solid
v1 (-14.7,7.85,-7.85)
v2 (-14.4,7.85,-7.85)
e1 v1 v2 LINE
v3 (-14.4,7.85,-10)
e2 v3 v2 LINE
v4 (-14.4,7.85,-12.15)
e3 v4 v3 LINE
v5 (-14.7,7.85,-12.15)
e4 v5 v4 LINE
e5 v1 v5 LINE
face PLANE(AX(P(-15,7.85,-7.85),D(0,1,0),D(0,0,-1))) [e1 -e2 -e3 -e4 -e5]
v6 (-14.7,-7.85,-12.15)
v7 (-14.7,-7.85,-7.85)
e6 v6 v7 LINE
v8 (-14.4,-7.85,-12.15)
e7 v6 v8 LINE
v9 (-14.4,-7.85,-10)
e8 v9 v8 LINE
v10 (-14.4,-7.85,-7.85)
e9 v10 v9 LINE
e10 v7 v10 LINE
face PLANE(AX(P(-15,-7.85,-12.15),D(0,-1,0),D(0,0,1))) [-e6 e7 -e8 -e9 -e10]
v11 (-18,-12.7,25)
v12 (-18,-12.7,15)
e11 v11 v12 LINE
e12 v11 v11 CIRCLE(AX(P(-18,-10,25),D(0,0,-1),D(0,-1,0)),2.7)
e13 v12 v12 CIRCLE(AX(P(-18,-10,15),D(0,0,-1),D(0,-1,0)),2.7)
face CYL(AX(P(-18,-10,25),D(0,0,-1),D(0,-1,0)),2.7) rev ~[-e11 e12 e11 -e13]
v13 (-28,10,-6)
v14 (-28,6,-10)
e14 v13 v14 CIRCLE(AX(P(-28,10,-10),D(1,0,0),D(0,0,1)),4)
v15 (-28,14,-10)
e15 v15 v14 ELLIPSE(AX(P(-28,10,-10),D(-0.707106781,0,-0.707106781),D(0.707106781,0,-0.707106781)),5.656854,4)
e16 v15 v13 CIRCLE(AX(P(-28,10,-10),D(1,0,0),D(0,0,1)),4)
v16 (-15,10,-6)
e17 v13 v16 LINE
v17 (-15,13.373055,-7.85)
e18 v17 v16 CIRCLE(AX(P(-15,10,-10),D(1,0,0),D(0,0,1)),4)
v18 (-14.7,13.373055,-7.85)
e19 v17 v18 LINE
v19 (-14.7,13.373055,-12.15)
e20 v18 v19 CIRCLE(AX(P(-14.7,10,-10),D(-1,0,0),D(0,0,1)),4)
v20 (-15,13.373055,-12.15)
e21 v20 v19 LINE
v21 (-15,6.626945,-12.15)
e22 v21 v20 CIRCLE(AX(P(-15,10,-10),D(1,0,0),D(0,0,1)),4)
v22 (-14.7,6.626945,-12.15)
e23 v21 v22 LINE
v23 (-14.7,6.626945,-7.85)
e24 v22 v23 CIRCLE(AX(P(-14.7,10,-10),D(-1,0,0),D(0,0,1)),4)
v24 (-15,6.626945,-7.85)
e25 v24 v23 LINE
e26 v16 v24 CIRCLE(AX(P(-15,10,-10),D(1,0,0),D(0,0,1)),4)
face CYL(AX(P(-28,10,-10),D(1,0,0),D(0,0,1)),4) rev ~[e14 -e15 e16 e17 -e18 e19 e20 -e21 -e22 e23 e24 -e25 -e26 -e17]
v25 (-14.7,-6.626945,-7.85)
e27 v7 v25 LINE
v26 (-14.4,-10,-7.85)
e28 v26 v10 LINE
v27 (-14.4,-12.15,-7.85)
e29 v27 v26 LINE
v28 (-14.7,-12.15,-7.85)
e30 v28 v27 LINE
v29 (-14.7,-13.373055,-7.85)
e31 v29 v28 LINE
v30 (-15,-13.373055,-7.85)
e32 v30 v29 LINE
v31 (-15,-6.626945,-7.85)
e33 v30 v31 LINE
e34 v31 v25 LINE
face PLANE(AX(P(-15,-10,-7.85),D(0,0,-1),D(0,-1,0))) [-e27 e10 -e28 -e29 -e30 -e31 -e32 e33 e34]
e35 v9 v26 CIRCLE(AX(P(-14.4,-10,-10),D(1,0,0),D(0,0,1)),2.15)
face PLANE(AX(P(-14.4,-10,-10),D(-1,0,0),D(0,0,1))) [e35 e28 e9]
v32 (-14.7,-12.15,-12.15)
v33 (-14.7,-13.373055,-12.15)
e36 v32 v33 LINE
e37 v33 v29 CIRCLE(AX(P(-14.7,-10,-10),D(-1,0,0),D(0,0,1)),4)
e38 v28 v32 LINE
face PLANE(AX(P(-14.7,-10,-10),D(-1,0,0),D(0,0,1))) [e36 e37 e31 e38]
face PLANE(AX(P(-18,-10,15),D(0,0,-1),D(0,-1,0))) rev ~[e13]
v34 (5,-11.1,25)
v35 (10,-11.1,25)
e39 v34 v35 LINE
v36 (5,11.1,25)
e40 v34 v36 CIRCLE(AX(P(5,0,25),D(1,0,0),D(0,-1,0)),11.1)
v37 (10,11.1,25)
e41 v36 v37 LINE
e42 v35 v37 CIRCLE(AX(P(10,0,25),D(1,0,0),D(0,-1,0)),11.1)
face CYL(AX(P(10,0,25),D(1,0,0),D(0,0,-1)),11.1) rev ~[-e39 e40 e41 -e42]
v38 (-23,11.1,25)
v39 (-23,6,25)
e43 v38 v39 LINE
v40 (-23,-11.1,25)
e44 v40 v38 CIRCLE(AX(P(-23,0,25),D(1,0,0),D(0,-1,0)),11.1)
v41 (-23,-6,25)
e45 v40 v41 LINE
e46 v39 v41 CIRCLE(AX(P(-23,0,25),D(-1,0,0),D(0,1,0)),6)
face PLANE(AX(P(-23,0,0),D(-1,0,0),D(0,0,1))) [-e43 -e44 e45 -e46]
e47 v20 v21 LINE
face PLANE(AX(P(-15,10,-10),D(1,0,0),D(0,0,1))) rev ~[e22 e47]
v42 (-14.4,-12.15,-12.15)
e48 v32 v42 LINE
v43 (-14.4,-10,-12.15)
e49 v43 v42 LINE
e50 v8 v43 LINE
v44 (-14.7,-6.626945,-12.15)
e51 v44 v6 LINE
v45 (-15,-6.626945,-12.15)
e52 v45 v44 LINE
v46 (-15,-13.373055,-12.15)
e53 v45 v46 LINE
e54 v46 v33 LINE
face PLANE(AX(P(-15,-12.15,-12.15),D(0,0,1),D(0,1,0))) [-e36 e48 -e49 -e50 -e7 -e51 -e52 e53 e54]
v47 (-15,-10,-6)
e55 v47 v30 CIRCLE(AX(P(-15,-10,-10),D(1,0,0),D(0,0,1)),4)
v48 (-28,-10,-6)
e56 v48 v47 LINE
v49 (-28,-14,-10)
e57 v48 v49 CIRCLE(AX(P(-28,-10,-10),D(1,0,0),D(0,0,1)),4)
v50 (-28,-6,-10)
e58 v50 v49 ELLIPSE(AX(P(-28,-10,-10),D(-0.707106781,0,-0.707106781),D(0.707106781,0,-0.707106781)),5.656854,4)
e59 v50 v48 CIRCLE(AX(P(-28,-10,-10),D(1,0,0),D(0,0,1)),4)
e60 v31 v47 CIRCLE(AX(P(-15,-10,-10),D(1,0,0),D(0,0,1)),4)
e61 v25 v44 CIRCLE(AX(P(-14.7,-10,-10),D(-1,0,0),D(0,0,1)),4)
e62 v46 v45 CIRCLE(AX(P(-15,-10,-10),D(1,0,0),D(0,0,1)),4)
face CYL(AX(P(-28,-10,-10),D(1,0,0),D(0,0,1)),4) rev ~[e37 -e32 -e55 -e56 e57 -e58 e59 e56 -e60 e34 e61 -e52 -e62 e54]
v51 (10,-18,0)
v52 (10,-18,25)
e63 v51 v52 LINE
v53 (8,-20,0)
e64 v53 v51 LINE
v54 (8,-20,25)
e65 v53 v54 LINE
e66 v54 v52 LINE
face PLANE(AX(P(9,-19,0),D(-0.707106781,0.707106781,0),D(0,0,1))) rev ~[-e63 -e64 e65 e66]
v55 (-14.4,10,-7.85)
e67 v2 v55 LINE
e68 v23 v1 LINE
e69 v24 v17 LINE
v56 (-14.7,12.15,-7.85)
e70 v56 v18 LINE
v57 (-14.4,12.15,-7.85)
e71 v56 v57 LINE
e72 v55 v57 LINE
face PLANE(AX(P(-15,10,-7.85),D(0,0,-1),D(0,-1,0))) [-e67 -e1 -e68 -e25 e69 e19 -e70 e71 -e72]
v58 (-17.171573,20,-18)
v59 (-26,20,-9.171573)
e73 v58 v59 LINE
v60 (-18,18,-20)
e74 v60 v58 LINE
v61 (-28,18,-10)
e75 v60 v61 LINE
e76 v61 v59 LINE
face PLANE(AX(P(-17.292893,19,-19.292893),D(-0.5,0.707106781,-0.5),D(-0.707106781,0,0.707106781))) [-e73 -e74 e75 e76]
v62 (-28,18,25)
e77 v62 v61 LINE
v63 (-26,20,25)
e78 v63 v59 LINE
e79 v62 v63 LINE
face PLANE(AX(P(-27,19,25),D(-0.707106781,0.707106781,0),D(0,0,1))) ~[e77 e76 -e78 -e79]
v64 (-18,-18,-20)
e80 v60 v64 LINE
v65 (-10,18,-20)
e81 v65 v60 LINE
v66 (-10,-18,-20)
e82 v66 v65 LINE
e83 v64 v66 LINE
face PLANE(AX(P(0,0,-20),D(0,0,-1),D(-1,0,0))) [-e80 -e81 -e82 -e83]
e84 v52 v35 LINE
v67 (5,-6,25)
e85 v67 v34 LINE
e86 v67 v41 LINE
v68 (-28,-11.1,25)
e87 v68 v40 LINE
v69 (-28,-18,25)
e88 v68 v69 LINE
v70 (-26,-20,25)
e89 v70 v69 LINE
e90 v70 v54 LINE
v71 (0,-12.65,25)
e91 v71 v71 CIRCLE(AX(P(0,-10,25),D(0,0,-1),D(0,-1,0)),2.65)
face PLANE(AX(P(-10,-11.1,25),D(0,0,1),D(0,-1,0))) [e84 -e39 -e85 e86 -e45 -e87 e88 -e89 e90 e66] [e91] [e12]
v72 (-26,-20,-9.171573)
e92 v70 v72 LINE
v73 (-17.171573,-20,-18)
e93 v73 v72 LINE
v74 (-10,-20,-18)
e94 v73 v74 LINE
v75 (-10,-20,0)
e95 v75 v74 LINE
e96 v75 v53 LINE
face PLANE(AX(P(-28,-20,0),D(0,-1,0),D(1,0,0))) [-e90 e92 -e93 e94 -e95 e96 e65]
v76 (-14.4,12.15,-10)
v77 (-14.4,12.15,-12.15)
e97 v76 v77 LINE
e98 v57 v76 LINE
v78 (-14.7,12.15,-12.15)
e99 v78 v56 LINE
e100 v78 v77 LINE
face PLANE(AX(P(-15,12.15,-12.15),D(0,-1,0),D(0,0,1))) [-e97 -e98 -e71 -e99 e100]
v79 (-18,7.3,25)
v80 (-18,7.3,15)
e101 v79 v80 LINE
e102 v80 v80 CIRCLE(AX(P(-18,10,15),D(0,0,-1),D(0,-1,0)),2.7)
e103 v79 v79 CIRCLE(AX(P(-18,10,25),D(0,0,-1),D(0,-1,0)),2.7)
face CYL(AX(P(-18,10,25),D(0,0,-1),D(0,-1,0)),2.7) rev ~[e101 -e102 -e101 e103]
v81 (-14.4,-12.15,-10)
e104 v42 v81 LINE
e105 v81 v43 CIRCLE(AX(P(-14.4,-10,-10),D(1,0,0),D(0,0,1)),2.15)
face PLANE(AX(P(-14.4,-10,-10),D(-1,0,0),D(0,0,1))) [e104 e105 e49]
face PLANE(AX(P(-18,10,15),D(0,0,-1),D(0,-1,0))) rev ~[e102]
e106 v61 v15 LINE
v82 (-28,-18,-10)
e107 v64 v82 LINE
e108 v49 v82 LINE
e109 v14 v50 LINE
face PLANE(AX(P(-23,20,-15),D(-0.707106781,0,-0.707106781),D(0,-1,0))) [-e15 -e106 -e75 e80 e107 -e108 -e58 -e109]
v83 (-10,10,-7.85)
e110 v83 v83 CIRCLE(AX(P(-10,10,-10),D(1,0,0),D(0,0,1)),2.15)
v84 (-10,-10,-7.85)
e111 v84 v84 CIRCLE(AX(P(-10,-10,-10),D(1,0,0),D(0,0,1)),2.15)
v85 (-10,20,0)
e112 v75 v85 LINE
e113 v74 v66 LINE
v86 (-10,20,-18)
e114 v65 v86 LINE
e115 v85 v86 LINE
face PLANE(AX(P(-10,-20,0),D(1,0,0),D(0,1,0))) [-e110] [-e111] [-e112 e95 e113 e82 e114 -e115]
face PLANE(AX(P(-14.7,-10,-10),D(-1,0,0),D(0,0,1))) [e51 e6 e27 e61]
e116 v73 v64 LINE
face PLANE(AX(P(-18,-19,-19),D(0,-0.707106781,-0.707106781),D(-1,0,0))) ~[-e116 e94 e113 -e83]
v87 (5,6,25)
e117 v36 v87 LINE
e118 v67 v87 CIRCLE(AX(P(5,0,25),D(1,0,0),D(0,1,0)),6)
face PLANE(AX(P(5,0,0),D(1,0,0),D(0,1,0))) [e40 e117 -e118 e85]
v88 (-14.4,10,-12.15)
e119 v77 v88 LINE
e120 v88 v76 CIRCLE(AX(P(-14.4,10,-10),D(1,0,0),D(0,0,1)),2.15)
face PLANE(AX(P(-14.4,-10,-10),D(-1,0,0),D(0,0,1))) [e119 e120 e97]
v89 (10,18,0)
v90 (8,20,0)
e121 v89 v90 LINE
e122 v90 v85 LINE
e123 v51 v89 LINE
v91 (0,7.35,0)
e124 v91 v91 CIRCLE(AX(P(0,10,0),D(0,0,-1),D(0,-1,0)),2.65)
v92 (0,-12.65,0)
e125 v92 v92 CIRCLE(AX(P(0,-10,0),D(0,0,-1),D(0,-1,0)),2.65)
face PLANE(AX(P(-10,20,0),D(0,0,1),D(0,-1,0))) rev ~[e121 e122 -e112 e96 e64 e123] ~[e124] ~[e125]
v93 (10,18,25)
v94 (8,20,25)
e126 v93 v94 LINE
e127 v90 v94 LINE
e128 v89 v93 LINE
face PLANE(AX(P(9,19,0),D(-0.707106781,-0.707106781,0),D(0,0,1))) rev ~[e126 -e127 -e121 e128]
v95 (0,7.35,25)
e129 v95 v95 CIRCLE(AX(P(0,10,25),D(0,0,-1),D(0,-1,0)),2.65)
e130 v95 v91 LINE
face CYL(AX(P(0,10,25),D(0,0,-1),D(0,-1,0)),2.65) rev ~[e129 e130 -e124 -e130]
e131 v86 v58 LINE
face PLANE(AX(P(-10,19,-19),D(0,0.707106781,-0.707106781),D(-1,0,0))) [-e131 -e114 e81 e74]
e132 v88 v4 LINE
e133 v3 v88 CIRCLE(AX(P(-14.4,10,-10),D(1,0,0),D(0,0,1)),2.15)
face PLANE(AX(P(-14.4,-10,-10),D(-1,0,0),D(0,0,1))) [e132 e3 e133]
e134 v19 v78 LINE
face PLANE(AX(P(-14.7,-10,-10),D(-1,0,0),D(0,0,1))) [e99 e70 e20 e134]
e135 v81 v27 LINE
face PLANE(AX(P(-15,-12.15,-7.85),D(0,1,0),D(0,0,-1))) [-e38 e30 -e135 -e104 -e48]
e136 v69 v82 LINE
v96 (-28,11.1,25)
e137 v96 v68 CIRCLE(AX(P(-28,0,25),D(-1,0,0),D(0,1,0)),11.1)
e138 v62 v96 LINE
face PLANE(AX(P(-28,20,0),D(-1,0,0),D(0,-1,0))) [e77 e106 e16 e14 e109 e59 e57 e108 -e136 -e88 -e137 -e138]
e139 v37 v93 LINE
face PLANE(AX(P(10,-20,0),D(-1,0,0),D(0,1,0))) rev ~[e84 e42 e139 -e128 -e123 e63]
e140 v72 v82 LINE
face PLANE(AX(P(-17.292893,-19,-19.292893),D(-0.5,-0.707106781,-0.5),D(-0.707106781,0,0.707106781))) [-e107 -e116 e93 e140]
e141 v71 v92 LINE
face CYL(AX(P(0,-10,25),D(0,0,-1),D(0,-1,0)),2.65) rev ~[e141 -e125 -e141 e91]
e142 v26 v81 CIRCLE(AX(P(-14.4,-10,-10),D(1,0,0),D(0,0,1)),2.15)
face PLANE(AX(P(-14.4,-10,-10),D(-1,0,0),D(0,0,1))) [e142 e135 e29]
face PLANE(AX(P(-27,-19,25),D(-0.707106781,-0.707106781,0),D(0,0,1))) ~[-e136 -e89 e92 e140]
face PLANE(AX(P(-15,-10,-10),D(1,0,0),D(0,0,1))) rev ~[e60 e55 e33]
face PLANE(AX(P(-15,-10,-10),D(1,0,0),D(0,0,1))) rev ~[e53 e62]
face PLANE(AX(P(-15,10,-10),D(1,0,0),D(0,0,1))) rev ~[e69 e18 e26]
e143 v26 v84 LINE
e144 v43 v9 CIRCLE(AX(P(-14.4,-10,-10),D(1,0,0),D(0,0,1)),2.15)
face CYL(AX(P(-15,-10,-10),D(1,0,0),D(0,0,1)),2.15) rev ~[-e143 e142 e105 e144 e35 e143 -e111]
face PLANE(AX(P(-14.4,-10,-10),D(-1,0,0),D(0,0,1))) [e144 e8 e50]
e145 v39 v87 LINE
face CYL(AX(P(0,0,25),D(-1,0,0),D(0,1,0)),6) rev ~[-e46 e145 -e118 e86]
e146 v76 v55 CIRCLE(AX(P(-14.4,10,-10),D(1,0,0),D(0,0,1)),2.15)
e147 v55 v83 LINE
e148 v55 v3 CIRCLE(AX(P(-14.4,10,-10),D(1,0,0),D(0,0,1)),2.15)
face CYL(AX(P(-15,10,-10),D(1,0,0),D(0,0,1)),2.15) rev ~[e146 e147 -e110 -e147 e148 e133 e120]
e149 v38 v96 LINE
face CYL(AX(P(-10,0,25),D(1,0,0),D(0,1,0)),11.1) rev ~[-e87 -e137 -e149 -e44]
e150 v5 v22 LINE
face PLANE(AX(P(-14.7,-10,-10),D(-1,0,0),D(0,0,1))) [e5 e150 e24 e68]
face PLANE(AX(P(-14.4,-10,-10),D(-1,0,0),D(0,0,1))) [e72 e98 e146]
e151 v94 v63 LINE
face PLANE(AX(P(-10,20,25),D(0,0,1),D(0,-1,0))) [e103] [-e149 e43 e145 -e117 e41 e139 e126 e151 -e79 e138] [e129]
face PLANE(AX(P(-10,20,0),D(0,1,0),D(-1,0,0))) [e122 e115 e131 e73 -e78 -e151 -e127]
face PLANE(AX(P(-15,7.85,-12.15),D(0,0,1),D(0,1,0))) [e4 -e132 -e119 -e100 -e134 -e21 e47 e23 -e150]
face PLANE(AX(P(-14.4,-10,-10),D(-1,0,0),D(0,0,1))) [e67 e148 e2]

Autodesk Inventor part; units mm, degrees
ref_plane "YZ Plane" through (0, 0, 0) normal (1, 0, 0) x (0, 1, 0)
ref_plane "XZ Plane" through (0, 0, 0) normal (0, 1, 0) x (-1, 0, 0)
ref_plane "XY Plane" through (0, 0, 0) normal (0, 0, 1) x (1, 0, 0)
sketch "スケッチ1" plane through (0, 0, 0) normal (0, 0, 1) x (1, 0, 0)
  line L0 (-10, -20) -> (10, -20)
  line L1 (10, -20) -> (10, 20)
  line L2 (10, 20) -> (-10, 20)
  line L3 (-10, 20) -> (-10, -20)
  line L4 (-10, -20) -> (10, 20) construction
  line L5 (10, -20) -> (-10, 20) construction
  point P0 (0, 0)
  dimension "d0" = 20
  dimension "d1" = 40
extrude "押し出し1" add sketch "スケッチ1" along normal blind 25
sketch "スケッチ2" plane through (10, -20, 0) normal (1, 0, 0) x (0, 0, -1)
  circle A0 centre (-25, 20) radius 11.1
  line L0 (0, 40) -> (-25, 40) projected
  dimension "d4" = 22.2
  dimension "d7" = 20
extrude "押し出し2" cut sketch "スケッチ2" against normal through all
sketch "スケッチ7" plane through (0, 0, 0) normal (1, 0, 0) x (0, 1, 0)
  arc A0 (-11.1, 25) -> (11.1, 25) centre (0, 25) ccw projected
  line L0 (20, 25) -> (11.1, 25) projected
  line L1 (20, 0) -> (20, 25) projected
  line L2 (20, 0) -> (-20, 0) projected
  line L3 (-20, 0) -> (-20, 25) projected
  line L4 (-11.1, 25) -> (-20, 25) projected
  circle A1 centre (0, 25) radius 6
  arc A2 (-11.1, 25) -> (11.1, 25) centre (0, 25) ccw projected
  line L5 (11.1, 25) -> (-11.1, 25)
  point P0 (0, 0)
  point P1 (-6, 25)
  point P2 (6, 25)
  dimension "d27" = 12
extrude "押し出し5" add sketch "スケッチ7" along normal mid plane 10 contours L5 A1 A0
sketch "スケッチ5" plane through (0, 0, 25) normal (0, 0, 1) x (1, 0, 0)
  line L0 (10, 20) -> (-10, 20) projected
  line L1 (-10, -20) -> (10, -20) projected
  point P0 (0, 0)
  point P1 (0, 10)
  point P2 (0, -10)
  dimension "d18" = 10
  dimension "d19" = 10
hole "穴1" at (0, 10, 25) at (0, -10, 25) direction (0, 0, -1) diameter 5.3 depth 58
sketch "Sketch9" plane through (-10, -20, 0) normal (-1, 0, 0) x (0, 0, 1)
  arc A0 (25, 31.1) -> (25, 8.9) centre (25, 20) ccw projected
  line L0 (25, 40) -> (25, 31.1) projected
  line L1 (0, 40) -> (25, 40) projected
  line L2 (0, 40) -> (0, 0) projected
  line L3 (0, 0) -> (25, 0) projected
  line L4 (25, 8.9) -> (25, 0) projected
  point P0 (0, 20)
extrude "Extrusion7" add sketch "Sketch9" along normal blind 18
sketch "Sketch10" plane through (0, 0, 0) normal (0, 0, -1) x (-1, 0, 0)
  circle A0 centre (0, 10) radius 2.65 projected
  circle A1 centre (0, -10) radius 2.65 projected
  line L0 (28, -20) -> (-10, -20) projected
  line L1 (28, 20) -> (28, -20) projected
  line L2 (-10, 20) -> (28, 20) projected
  line L3 (-10, -20) -> (-10, 20) projected
  line L4 (-10, -20) -> (-10, -11.1) projected
  line L5 (-10, 20) -> (28, 20) projected
  line L6 (-10, -20) -> (10, -20)
  line L7 (10, -20) -> (10, 20)
  line L8 (10, 20) -> (-10, 20)
  line L9 (-10, 20) -> (-10, -20)
  point P0 (0, 0)
  dimension "d34" = 20
extrude "Extrusion8" add sketch "Sketch10" along normal blind 20 contours L0 L7 L2 L1
sketch "Sketch11" plane through (-5, 0, 0) normal (-1, 0, 0) x (0, 0, 1)
  line L0 (0, 7.35) -> (25, 7.35) projected
  line L1 (25, -11.1) -> (25, -6) projected
  arc A0 (25, 6) -> (25, -6) centre (25, 0) ccw projected
  line L2 (25, 6) -> (25, 11.1) projected
  arc A1 (25, 11.1) -> (25, -11.1) centre (25, 0) ccw projected
  point P0 (0, 0)
extrude "Extrusion9" add sketch "Sketch11" along normal blind 18
chamfer "Chamfer2" distance 10 angle 45 1 edges at (-28, 0, -20)
sketch "Sketch12" plane through (0, 0, 25) normal (0, 0, 1) x (1, 0, 0)
  line L0 (10, -20) -> (10, -11.1) projected
  circle A0 centre (0, -10) radius 2.65 projected
  line L1 (10, -11.1) -> (5, -11.1) projected
  line L2 (5, -6) -> (5, -11.1) projected
  line L3 (5, -6) -> (-23, -6) projected
  line L4 (-23, -11.1) -> (-23, -6) projected
  line L5 (-23, -11.1) -> (-28, -11.1) projected
  line L6 (-28, -20) -> (-28, -11.1) projected
  line L7 (10, -20) -> (-28, -20) projected
  line L8 (10, -20) -> (10, -11.1) projected
  circle A1 centre (0, 10) radius 2.65 projected
  line L9 (-28, 11.1) -> (-23, 11.1) projected
  line L10 (-23, 6) -> (-23, 11.1) projected
  line L11 (-23, 6) -> (5, 6) projected
  line L12 (5, 11.1) -> (5, 6) projected
  line L13 (5, 11.1) -> (10, 11.1) projected
  line L14 (10, 11.1) -> (10, 20) projected
  line L15 (10, 20) -> (-28, 20) projected
  line L16 (-28, 11.1) -> (-28, 20) projected
  point P0 (0, 0)
  point P1 (-18, -10)
  point P2 (-18, 10)
  dimension "d42" = 28
hole "Hole2" at (-18, -10, 25) at (-18, 10, 25) direction (0, 0, -1) diameter 5.4 depth 10
chamfer "Chamfer3" distance 2 angle 45 8 edges at (10, -20, 12.5) (10, 20, 12.5) (-28, -20, 7.5) (-28, 20, 7.5) (-23, 20, -15) (-23, -20, -15) (-14, 20, -20) (-14, -20, -20)
sketch "スケッチ13" plane through (-28, -20, 0) normal (-1, 0, 0) x (0, 0, 1)
  line L0 (-20, 38) -> (-10, 38) projected
  line L1 (-20, 38) -> (-20, 2) projected
  line L2 (-10, 2) -> (-20, 2) projected
  line L3 (-10, 2) -> (-10, 38) projected
  line L4 (-9.1716, 0) -> (25, 0) projected
  line L5 (25, 0) -> (25, 2) projected
  line L6 (25, 2) -> (-10, 2) projected
  line L7 (-9.1716, 0) -> (-10, 2) projected
  line L8 (-10, 38) -> (25, 38) projected
  line L9 (25, 38) -> (25, 40) projected
  line L10 (25, 40) -> (-9.1716, 40) projected
  line L11 (-9.1716, 40) -> (-10, 38) projected
  point P0 (0, 20)
  point P1 (-10, 10)
  point P2 (-10, 30)
  dimension "d53" = 10
  dimension "d54" = 10
hole "穴3" at (-28, -10, -10) at (-28, 10, -10) direction (1, 0, 0) diameter 4.3 end through all counterbore diameter 8 counterbore depth 13
sketch "スケッチ14" plane through (-15, -10, -10) normal (-1, 0, 0) x (0, 0, 1)
  circle A0 centre (0, 0) radius 2.15 projected
  circle A1 centre (0, 20) radius 4 projected
  circle A2 centre (0, 20) radius 2.15 projected
  line L0 (2.15, -2.15) -> (-2.15, -2.15)
  line L1 (-2.15, -2.15) -> (-2.15, 2.15)
  line L2 (-2.15, 2.15) -> (2.15, 2.15)
  line L3 (2.15, 2.15) -> (2.15, -2.15)
  line L4 (2.15, -2.15) -> (-2.15, 2.15) construction
  line L5 (-2.15, -2.15) -> (2.15, 2.15) construction
  line L6 (2.15, 17.85) -> (-2.15, 17.85)
  line L7 (-2.15, 17.85) -> (-2.15, 22.15)
  line L8 (-2.15, 22.15) -> (2.15, 22.15)
  line L9 (2.15, 22.15) -> (2.15, 17.85)
  line L10 (2.15, 17.85) -> (-2.15, 22.15) construction
  line L11 (-2.15, 17.85) -> (2.15, 22.15) construction
  circle A3 centre (0, 20) radius 2.15 projected
  point P0 (10, 10)
extrude "押し出し10" cut sketch "スケッチ14" against normal blind 0.6 contours A0 | L3 L0 A0 | A0 L2 L3 | A0 L1 L2 | L0 L1 A0 | A2 | L9 L6 A2 | A2 L8 L9 | A2 L7 L8 | L6 L7 A2
sketch "スケッチ15" plane through (-15, -10, -10) normal (-1, 0, 0) x (0, 0, 1)
  line L0 (2.15, -2.15) -> (-2.15, -2.15) projected
  line L1 (-2.15, 2.15) -> (2.15, 2.15) projected
  circle A0 centre (0, 0) radius 4 projected
  line L2 (-2.15, -16.7131) -> (2.15, -16.7131)
  line L3 (2.15, -16.7131) -> (2.15, 35.0465)
  line L4 (2.15, 35.0465) -> (-2.15, 35.0465)
  line L5 (-2.15, 35.0465) -> (-2.15, -16.7131)
  line L6 (-2.15, 17.85) -> (-2.15, 22.15) projected
  line L7 (-2.15, 22.15) -> (2.15, 22.15) projected
  line L8 (2.15, 22.15) -> (2.15, 17.85) projected
  line L9 (2.15, 17.85) -> (-2.15, 17.85) projected
  circle A1 centre (0, 20) radius 4 projected
  point P0 (10, 10)
  point P1 (-2.15, -3.3731)
  point P2 (2.15, -3.3731)
  point P3 (-2.15, 3.3731)
  point P4 (2.15, 3.3731)
  point P5 (2.15, 23.3731)
  point P6 (-2.15, 23.3731)
  point P7 (-2.15, 16.6269)
  point P8 (2.15, 16.6269)
extrude "押し出し11" cut sketch "スケッチ15" against normal blind 0.3 contours L3 A0 L5 L0 | L1 L5 A0 L3 | A1 L5 L9 L3 | A1 L3 L7 L5
properties part number "Print_Parts_L" material "PC/ABS プラスチック"
